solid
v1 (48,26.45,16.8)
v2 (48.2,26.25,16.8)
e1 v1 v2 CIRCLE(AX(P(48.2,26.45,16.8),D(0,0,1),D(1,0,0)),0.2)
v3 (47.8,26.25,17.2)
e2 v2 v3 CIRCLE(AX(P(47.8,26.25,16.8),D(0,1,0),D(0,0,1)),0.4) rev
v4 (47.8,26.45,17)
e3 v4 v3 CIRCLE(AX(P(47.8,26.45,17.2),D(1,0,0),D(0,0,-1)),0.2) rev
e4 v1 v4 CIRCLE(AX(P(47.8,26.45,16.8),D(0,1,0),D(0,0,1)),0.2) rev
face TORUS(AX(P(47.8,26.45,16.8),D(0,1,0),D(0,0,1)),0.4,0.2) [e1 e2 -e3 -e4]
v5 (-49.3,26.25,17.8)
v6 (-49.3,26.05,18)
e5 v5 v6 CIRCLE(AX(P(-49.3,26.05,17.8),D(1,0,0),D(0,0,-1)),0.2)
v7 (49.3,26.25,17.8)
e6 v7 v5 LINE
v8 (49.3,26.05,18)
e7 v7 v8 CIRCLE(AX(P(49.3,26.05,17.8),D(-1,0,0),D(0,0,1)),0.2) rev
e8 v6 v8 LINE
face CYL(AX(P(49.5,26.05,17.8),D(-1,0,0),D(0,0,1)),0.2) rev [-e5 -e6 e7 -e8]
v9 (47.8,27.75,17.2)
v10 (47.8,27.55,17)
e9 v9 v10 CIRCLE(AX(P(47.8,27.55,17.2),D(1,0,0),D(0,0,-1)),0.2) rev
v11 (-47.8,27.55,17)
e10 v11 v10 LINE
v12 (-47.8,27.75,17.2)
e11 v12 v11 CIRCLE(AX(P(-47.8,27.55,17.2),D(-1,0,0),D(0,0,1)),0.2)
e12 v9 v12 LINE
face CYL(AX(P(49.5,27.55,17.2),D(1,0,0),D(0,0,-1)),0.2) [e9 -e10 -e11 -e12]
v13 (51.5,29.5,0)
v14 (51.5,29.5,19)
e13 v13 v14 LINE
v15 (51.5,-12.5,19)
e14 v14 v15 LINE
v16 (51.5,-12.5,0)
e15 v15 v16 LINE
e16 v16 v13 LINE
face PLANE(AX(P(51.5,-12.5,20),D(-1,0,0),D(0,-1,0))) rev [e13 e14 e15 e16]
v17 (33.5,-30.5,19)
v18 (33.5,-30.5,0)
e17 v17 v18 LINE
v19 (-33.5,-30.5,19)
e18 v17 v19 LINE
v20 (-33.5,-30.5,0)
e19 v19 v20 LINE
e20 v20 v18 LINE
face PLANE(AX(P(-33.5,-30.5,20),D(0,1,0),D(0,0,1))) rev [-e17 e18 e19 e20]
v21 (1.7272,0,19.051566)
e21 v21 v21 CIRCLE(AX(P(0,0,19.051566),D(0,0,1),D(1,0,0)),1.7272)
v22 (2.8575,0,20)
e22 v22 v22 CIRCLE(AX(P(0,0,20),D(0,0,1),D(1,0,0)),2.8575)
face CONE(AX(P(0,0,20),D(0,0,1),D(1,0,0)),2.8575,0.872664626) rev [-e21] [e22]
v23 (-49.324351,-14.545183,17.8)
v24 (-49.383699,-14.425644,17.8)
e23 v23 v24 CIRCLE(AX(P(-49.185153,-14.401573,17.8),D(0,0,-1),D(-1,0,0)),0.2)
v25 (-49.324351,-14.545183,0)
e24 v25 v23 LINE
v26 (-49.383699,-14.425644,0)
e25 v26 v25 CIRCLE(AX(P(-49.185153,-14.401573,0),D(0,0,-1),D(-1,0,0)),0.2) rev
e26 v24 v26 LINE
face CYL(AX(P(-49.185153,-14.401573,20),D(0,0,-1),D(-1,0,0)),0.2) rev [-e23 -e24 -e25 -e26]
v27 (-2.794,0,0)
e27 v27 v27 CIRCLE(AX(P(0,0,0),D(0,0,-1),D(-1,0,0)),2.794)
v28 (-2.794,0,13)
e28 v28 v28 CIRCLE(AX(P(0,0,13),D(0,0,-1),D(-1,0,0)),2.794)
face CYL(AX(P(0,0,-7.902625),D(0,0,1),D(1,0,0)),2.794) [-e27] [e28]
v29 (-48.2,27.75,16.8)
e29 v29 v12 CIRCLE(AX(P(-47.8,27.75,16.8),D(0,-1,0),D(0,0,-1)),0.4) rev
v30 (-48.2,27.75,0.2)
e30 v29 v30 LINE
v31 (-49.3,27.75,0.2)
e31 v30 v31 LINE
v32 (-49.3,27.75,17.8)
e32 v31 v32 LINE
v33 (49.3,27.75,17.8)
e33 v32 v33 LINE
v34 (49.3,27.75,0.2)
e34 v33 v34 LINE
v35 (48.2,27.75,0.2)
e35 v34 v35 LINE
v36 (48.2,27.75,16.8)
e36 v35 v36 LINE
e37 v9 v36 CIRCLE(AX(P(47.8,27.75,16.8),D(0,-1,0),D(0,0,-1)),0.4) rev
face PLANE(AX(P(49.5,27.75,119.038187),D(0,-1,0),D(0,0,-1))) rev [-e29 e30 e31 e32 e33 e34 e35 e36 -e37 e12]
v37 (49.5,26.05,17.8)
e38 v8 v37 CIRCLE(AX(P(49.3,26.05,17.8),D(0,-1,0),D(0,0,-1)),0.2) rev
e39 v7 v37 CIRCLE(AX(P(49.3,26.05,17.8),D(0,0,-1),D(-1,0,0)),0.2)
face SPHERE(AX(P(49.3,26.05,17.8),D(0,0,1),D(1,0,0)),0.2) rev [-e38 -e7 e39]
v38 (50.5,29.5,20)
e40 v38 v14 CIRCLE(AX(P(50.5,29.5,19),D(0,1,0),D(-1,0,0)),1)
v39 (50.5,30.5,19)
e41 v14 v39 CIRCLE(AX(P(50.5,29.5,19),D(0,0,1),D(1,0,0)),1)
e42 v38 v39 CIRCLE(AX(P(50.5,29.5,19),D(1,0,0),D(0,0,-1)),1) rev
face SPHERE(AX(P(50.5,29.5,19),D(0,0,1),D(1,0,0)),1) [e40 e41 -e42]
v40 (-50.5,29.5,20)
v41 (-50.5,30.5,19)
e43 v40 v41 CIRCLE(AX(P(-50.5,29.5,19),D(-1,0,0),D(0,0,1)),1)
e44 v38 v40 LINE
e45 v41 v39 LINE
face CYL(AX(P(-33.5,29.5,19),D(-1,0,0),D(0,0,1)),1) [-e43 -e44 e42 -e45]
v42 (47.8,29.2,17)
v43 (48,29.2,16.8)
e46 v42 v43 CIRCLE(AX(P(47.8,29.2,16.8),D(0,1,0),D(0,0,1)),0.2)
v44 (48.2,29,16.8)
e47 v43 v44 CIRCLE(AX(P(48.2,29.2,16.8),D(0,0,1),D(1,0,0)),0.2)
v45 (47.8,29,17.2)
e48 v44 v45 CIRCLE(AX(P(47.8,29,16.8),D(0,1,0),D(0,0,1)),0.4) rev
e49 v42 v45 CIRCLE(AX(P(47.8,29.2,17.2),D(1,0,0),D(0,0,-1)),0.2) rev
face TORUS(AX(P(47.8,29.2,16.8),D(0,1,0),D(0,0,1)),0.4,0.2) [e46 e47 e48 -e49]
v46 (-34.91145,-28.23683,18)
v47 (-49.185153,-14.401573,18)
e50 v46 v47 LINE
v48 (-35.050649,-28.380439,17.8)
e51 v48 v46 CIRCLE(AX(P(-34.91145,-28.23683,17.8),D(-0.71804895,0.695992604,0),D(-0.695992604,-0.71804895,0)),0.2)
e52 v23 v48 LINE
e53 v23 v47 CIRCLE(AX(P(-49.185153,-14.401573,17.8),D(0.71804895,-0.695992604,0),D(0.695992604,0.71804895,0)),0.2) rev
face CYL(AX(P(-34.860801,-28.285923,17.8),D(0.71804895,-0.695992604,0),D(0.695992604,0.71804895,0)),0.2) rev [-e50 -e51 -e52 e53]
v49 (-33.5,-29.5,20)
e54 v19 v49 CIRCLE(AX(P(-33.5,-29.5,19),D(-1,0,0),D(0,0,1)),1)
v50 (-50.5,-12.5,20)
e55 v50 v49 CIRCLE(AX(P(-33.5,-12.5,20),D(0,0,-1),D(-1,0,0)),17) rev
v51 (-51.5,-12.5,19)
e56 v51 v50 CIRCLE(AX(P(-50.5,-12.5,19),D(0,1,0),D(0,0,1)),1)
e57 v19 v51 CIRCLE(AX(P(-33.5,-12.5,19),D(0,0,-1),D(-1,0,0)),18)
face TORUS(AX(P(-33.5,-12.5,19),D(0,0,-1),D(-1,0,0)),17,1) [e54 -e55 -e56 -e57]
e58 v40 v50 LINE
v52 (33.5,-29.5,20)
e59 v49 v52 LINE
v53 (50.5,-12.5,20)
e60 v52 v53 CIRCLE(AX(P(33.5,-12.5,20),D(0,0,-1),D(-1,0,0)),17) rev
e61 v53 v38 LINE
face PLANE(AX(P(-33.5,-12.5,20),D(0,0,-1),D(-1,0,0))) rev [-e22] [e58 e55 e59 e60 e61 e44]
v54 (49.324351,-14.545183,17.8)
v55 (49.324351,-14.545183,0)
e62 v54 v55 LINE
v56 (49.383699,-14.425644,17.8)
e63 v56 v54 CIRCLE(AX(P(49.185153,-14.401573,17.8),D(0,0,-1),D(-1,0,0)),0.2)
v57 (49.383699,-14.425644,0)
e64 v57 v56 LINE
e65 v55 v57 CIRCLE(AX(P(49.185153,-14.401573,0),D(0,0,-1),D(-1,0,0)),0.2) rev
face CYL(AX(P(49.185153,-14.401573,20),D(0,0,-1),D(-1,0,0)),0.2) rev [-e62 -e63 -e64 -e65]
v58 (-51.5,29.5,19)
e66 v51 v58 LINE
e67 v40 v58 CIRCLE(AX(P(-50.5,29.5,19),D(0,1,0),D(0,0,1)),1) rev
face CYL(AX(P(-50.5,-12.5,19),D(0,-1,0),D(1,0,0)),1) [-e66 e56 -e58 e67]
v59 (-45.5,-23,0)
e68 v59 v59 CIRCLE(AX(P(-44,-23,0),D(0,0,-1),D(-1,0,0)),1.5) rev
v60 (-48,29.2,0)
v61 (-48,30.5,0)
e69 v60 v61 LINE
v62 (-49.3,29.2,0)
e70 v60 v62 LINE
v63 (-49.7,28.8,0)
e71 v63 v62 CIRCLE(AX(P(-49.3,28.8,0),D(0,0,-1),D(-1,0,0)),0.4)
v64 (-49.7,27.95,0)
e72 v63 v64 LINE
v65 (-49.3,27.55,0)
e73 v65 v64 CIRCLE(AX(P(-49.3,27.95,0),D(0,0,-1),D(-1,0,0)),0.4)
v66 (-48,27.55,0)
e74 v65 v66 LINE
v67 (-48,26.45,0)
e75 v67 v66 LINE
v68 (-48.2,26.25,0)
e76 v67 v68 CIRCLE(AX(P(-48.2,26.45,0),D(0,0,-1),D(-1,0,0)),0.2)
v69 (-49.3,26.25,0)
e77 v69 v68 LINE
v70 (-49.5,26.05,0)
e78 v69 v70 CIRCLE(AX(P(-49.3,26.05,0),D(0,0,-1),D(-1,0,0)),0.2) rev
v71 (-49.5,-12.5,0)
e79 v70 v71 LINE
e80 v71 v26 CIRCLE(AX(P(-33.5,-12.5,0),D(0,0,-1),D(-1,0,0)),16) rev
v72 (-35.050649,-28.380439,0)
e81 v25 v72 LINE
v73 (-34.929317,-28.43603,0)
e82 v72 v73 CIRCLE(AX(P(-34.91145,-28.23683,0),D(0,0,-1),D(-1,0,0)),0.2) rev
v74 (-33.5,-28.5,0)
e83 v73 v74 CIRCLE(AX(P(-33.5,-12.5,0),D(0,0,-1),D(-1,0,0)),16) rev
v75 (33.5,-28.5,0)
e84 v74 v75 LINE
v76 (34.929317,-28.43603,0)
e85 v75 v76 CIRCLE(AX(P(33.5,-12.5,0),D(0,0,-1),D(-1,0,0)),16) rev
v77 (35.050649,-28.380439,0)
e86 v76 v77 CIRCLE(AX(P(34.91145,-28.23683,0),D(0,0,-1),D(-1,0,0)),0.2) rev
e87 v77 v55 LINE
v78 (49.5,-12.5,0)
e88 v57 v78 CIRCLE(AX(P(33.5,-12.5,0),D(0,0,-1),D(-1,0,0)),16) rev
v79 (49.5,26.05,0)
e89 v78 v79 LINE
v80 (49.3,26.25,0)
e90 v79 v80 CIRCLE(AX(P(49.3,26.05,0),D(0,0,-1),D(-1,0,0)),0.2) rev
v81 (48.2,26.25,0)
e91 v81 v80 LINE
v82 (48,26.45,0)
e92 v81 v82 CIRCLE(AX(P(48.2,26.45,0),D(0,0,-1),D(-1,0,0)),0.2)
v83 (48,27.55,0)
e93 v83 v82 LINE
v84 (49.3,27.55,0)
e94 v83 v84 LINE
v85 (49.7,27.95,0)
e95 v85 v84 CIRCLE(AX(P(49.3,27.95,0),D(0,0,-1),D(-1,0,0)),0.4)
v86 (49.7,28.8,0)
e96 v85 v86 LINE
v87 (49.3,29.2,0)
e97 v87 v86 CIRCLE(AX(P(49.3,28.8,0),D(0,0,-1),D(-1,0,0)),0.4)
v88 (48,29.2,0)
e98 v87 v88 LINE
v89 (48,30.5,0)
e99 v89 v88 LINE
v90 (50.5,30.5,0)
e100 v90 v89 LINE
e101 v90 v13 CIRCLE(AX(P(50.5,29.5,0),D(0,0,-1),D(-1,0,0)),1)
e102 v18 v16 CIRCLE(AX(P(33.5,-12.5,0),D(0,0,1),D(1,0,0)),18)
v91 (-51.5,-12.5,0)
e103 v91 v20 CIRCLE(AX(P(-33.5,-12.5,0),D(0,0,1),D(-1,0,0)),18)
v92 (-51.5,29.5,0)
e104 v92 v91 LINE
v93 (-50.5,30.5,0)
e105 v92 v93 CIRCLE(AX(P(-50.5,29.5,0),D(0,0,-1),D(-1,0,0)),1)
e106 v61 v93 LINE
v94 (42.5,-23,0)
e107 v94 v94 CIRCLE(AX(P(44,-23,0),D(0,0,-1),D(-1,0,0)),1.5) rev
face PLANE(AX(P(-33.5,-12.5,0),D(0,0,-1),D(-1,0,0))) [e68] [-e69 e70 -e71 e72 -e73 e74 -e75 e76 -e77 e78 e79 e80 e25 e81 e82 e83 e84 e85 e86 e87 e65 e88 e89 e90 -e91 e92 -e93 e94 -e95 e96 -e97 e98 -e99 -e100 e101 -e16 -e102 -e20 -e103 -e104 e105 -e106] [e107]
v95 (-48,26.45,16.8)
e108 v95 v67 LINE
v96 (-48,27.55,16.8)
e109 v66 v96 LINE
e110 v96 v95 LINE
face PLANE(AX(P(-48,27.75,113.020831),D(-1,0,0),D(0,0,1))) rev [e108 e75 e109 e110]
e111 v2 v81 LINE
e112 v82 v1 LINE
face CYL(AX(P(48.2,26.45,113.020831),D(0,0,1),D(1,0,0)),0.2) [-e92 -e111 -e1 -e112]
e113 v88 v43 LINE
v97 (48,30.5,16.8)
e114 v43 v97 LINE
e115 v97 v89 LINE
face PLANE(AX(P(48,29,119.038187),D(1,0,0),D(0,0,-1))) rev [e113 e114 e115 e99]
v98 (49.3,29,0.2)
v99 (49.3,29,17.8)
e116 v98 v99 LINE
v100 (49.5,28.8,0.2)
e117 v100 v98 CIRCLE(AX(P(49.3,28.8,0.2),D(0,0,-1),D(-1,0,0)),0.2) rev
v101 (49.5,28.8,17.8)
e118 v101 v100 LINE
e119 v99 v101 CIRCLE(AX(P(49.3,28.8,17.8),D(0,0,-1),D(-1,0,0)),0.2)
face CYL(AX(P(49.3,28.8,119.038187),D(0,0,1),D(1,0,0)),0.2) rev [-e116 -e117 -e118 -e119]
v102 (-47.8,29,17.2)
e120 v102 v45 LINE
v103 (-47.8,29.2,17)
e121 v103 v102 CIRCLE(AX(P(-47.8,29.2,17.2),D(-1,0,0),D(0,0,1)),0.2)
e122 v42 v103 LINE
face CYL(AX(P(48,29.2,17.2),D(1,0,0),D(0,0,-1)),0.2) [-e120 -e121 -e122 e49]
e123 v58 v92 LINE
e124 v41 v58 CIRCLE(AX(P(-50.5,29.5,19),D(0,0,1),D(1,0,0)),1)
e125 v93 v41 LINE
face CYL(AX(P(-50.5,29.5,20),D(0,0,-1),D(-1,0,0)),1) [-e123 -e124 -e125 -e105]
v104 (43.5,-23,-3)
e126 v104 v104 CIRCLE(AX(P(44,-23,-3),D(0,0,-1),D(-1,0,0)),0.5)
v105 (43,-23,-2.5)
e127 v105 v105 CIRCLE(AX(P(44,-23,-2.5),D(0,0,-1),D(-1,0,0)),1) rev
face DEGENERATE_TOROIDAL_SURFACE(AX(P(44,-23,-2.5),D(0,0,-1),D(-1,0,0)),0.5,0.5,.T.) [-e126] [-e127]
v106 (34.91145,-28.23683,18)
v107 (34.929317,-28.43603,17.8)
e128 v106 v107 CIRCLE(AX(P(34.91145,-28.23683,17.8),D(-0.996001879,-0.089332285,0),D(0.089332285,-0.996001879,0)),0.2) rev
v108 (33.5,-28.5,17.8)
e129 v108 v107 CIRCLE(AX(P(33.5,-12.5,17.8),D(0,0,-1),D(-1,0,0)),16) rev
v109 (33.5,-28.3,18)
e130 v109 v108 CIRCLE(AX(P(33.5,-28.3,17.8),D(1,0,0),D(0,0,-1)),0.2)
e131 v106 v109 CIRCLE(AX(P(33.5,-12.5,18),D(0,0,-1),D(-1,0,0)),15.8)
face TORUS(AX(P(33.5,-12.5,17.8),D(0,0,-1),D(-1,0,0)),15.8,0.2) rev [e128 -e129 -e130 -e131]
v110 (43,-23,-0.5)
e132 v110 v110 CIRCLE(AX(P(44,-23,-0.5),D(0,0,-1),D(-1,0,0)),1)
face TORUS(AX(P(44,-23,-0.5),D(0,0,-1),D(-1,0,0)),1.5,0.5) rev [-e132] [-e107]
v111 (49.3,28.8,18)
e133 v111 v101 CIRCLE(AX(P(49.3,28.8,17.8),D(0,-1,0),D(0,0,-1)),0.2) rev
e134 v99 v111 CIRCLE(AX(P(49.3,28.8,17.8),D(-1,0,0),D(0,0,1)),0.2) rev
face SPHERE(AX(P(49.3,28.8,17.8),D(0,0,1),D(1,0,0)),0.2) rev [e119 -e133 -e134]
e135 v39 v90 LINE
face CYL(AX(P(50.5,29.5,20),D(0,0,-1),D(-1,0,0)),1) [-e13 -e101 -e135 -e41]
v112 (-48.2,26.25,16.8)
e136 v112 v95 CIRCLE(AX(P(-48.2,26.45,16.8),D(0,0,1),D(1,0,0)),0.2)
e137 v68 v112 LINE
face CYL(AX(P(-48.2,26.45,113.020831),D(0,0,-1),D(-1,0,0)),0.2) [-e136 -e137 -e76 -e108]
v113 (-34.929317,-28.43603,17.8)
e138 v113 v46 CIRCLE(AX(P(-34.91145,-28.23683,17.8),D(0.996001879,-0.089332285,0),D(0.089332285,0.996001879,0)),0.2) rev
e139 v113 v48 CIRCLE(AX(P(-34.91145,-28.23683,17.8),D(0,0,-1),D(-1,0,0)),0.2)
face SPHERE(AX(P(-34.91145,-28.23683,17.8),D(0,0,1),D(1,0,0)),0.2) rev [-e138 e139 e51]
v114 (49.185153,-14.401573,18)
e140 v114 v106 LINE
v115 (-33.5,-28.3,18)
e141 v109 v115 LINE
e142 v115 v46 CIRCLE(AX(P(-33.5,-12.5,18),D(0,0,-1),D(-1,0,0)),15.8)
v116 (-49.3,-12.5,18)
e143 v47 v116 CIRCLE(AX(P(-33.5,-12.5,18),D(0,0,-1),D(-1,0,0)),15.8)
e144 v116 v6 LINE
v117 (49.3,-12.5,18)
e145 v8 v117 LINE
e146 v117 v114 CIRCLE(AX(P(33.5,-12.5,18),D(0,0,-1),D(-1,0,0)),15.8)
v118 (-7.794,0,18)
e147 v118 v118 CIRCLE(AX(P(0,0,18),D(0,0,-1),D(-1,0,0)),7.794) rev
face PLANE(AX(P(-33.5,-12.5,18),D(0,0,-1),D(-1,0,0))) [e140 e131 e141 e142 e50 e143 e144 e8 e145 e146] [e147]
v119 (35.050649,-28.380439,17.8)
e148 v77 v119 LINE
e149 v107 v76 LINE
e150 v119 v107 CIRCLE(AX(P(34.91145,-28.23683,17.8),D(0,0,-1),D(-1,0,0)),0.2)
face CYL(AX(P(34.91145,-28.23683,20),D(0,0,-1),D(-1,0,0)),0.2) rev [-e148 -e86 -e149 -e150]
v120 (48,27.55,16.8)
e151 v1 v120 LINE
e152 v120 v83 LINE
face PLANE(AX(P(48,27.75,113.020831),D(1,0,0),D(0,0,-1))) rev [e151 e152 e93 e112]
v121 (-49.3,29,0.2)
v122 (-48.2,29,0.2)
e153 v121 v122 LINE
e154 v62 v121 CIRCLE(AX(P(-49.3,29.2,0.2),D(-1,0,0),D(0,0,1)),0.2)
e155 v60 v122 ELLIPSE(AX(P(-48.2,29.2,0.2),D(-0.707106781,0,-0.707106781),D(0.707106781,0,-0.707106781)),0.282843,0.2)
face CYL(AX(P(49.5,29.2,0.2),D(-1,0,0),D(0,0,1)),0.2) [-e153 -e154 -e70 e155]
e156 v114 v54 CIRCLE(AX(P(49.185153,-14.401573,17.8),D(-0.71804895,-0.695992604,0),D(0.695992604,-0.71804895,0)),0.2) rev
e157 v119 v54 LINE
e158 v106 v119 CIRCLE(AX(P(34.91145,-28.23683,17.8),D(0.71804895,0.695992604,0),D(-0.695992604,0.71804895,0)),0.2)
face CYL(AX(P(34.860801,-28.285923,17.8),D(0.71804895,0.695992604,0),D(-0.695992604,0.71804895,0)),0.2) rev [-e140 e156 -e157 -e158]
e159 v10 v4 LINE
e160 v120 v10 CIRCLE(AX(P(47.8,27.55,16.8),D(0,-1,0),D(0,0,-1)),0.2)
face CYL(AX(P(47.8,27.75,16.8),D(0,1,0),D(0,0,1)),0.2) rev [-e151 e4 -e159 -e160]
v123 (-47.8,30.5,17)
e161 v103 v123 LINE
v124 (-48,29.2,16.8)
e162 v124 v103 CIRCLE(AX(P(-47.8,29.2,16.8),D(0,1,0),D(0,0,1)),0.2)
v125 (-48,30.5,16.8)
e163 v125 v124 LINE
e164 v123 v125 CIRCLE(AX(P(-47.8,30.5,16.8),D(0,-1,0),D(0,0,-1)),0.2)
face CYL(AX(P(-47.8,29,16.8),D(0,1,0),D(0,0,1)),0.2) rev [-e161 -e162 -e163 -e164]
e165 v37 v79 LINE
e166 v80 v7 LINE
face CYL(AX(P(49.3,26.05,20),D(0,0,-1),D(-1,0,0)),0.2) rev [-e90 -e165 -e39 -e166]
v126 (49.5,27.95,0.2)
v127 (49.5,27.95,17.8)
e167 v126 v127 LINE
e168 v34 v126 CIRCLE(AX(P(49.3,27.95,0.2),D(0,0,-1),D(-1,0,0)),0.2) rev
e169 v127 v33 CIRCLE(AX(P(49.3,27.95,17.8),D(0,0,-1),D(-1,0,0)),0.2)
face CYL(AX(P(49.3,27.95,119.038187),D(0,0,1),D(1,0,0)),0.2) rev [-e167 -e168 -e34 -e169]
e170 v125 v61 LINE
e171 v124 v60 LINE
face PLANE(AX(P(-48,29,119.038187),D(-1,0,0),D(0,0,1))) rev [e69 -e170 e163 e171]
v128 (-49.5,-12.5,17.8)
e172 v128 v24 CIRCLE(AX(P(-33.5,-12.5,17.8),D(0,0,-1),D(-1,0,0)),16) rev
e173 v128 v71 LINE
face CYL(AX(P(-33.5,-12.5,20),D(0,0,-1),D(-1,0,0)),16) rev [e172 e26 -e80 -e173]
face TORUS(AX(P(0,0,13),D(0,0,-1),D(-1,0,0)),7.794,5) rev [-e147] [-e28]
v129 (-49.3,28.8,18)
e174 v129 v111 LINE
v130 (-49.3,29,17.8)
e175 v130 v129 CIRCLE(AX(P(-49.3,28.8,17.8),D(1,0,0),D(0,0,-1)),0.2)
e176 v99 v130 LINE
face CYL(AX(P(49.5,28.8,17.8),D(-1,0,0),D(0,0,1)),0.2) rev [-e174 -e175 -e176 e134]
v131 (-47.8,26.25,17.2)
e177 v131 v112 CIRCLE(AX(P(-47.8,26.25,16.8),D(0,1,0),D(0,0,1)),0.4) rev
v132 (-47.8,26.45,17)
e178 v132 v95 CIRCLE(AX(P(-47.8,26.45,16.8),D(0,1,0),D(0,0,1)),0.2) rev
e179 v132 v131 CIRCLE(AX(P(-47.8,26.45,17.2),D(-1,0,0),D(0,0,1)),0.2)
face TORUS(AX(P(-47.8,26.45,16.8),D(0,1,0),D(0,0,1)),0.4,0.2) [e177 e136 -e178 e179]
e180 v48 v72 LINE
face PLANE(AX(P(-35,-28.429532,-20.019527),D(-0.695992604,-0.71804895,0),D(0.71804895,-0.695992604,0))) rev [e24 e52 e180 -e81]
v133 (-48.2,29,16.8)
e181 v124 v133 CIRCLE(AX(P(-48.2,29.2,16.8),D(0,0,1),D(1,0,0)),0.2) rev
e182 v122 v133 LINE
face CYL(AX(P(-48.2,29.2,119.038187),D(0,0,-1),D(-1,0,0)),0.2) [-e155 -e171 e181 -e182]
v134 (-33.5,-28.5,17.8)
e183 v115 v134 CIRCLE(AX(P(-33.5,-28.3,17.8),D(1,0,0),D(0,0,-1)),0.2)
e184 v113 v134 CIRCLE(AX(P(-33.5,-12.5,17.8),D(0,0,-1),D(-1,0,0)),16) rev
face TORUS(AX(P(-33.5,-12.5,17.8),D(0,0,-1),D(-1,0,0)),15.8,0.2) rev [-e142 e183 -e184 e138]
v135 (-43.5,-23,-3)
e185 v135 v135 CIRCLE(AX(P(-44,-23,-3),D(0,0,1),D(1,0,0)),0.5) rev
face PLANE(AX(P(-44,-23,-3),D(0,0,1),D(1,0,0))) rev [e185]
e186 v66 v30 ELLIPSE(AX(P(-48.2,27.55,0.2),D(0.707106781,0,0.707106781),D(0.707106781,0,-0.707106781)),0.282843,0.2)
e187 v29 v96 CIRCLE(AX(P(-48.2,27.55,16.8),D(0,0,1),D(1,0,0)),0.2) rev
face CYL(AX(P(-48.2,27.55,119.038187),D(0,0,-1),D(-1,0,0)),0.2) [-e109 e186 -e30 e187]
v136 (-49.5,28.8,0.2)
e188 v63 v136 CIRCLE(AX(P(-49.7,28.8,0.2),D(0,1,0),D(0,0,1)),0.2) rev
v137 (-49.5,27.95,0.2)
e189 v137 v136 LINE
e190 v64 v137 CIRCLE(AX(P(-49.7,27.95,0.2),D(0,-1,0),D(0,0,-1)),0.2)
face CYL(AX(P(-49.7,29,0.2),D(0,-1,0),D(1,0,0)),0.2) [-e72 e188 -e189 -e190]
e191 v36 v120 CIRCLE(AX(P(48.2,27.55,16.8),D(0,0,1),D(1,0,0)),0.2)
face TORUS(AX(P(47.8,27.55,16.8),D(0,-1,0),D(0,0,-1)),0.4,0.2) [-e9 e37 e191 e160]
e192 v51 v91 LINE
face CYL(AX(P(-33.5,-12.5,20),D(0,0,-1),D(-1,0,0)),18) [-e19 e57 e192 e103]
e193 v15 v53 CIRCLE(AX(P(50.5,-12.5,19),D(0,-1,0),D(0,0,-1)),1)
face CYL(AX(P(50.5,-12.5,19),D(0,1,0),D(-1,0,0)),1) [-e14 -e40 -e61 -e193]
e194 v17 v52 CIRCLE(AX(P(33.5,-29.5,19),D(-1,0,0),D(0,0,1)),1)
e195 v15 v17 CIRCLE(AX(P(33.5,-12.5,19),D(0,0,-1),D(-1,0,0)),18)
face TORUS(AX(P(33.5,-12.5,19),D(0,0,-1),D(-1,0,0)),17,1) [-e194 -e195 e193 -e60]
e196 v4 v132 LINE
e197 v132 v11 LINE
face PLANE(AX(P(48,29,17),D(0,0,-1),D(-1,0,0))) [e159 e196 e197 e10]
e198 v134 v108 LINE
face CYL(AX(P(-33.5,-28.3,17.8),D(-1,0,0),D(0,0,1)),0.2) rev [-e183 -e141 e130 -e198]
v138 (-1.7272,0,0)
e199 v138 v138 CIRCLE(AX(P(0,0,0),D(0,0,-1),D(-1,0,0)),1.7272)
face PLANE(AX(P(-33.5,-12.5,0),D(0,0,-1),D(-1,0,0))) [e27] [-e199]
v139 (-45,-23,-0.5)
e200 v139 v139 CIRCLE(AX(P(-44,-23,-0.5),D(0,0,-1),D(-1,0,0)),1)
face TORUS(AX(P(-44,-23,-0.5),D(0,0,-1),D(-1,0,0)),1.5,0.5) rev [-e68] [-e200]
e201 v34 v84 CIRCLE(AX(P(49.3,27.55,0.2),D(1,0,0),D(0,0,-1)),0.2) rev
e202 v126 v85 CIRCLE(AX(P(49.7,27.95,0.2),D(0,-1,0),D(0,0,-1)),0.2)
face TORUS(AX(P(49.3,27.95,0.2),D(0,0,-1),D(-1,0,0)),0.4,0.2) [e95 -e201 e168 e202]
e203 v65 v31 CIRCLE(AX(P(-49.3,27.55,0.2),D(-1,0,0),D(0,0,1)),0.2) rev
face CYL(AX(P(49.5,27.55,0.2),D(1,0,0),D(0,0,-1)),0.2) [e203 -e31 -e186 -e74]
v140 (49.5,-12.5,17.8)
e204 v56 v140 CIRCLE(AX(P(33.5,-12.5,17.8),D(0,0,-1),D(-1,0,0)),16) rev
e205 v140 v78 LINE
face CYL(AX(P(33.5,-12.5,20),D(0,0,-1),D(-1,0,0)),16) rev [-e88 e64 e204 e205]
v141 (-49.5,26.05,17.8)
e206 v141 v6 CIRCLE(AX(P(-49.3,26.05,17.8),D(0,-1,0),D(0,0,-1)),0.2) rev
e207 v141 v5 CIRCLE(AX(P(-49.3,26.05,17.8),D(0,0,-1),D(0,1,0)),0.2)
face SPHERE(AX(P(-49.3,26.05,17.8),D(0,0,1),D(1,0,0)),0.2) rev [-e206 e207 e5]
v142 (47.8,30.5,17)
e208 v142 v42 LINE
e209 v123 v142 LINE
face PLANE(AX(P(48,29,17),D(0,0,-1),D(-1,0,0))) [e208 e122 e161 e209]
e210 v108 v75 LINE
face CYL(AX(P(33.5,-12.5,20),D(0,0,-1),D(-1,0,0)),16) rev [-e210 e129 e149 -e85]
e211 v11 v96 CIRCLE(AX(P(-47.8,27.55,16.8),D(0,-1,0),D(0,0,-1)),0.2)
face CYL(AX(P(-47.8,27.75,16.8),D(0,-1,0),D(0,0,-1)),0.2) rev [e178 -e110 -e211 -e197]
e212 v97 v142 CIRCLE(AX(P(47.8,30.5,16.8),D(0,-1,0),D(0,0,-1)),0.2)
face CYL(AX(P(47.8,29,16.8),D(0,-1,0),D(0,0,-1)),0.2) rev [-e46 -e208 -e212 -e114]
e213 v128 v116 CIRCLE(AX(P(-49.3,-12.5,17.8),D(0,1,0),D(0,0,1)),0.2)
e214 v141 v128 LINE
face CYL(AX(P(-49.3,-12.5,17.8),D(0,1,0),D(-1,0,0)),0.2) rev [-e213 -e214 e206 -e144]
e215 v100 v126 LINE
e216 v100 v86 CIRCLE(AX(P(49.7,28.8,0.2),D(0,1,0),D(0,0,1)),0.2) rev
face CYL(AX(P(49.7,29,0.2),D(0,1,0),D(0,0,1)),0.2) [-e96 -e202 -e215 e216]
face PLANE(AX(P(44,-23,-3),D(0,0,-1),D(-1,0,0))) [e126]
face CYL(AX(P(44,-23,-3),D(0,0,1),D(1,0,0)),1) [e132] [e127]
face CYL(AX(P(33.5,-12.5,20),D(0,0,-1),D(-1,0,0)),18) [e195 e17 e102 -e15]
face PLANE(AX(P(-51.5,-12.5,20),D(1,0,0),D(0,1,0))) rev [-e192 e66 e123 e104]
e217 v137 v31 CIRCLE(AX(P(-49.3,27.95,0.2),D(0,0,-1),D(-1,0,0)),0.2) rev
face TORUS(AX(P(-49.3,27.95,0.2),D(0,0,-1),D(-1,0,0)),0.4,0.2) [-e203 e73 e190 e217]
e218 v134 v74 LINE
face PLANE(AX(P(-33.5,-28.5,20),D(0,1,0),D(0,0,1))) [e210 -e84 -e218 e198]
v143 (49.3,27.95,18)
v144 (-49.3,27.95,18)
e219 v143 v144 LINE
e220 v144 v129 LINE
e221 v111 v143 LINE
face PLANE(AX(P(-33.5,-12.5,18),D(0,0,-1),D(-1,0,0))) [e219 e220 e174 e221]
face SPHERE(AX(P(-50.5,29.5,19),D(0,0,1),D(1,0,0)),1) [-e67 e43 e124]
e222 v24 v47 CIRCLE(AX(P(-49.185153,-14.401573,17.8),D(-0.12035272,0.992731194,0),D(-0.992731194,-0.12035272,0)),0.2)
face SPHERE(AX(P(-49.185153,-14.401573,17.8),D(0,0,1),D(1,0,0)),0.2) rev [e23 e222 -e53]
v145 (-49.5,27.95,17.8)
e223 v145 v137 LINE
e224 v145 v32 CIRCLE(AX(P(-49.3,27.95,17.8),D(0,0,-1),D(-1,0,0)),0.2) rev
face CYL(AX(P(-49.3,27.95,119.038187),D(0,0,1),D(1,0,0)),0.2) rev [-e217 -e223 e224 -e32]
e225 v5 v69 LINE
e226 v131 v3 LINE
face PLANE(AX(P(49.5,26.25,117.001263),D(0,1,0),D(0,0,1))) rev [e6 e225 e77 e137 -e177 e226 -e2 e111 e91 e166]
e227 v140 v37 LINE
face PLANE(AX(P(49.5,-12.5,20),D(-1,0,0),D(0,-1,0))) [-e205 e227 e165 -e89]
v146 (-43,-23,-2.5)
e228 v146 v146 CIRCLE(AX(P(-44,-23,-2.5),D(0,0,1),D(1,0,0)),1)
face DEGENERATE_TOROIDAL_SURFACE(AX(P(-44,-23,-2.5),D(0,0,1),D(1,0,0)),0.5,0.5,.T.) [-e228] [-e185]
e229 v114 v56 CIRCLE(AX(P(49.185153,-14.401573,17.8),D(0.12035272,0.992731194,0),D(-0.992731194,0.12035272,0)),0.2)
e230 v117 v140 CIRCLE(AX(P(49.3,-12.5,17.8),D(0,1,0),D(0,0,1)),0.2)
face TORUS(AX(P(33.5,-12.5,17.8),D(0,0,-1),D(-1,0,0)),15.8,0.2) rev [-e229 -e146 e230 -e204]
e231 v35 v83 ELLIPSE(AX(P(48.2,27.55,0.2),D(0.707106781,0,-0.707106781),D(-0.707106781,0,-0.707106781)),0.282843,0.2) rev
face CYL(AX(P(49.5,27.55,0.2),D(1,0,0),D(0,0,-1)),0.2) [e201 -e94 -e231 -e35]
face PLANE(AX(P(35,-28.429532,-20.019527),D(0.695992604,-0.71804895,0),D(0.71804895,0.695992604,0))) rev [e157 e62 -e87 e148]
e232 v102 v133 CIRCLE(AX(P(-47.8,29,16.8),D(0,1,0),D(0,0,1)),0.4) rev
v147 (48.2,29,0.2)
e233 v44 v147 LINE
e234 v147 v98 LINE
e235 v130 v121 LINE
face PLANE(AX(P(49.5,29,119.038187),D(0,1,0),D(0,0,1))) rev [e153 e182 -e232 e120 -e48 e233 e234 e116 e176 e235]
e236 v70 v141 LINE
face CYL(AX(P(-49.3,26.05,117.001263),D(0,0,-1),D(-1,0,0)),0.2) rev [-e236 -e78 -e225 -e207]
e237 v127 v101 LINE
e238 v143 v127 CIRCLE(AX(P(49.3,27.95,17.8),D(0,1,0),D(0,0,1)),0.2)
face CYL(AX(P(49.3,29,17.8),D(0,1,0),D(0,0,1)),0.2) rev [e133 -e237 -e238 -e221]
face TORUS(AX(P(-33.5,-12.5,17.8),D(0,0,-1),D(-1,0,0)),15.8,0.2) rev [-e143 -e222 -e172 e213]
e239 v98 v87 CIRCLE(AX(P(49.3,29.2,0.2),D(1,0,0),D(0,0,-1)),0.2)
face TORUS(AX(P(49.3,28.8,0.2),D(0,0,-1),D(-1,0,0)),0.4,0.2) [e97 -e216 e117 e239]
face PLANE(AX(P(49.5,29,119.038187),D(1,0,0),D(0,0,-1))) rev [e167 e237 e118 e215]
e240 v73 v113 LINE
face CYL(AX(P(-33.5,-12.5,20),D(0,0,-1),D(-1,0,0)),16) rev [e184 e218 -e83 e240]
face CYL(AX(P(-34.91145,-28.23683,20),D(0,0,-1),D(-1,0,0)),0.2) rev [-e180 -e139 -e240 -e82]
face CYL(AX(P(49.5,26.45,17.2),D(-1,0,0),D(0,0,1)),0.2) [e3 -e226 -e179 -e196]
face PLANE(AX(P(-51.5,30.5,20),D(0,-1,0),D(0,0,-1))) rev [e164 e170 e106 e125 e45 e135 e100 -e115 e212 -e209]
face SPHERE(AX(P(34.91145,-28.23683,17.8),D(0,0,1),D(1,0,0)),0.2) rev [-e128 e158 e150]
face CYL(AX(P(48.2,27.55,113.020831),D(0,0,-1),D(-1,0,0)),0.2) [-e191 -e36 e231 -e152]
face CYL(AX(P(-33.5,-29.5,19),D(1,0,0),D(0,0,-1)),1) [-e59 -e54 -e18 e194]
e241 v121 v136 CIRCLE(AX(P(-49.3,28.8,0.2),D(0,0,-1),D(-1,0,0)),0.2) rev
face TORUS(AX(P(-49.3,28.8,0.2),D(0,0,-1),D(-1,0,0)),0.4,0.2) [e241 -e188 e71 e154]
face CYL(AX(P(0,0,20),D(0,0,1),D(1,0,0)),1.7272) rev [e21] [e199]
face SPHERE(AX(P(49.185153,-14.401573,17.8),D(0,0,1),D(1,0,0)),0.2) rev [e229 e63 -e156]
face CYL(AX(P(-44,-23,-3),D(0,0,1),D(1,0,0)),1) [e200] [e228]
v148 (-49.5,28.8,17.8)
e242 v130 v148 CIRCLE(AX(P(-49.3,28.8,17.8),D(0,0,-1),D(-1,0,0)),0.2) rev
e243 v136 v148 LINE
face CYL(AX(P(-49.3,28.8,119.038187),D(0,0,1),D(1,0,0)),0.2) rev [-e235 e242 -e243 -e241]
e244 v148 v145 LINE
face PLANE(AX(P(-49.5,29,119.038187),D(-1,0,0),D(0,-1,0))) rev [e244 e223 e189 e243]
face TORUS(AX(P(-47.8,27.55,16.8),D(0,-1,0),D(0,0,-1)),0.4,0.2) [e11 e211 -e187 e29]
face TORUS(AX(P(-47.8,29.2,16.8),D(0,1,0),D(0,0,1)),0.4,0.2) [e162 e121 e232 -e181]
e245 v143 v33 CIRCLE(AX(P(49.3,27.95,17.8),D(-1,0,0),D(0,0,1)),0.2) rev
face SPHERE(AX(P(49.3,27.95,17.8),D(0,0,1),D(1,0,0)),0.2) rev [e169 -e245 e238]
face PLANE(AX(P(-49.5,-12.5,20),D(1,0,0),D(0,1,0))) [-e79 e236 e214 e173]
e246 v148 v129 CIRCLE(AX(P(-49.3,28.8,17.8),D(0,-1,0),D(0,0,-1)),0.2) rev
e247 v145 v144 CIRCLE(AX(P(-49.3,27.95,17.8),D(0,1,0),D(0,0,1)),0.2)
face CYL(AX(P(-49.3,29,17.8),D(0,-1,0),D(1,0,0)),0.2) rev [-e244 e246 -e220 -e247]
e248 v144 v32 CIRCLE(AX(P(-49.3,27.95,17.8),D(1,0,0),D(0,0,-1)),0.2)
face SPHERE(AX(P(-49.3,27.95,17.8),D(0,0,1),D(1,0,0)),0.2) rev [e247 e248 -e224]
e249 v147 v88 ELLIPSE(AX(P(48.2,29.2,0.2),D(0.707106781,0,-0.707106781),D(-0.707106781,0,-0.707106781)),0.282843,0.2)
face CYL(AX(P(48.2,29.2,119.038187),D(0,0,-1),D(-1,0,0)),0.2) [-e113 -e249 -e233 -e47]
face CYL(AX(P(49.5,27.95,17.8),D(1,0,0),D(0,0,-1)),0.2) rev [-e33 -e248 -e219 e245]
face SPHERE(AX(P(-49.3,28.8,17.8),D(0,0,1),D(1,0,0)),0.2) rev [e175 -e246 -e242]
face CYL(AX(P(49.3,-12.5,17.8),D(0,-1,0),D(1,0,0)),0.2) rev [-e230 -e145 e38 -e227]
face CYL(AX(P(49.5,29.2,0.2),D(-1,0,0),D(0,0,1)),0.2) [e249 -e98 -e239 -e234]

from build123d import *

# Parameters (mm, degrees)
BOSS_EXTRU_1_DEPTH                                = 20
ENL_V_MAT_EXTRU_1_DEPTH                           = 18
COQUE2_DEPTH                                      = 18
ESQUISSE14_W                                      = 96
ESQUISSE14_H                                      = 1.5
BOSS_EXTRU_8_DEPTH                                = 1
ESQUISSE3_W                                       = 96
ESQUISSE3_H                                       = 2
ENL_V_MAT_EXTRU_2_DEPTH                           = 17
ESQUISSE4_R                                       = 2.794
BOSS_EXTRU_2_DEPTH                                = 18
ESQUISSE5_R                                       = 1
ENL_V_MAT_EXTRU_3_DEPTH                           = 5
BOSS_EXTRU_4_START                                = 18
BOSS_EXTRU_4_DEPTH                                = 18
ESQUISSE8_R                                       = 1
BOSS_EXTRU_5_DEPTH                                = 3
CONG_5_R                                          = 0.5
CONG_6_R                                          = 1
ENL_V_MAT_EXTRU_4_REACH                           = 65.107
ESQUISSE9_W                                       = 99
ESQUISSE9_H                                       = 0.5
CONG_8_R                                          = 0.2
CSK_FOR_4_FLAT_HEAD_MACHINE_SCREW_100_D           = 3.4544
CSK_FOR_4_FLAT_HEAD_MACHINE_SCREW_100_CSINK_D     = 5.715
CSK_FOR_4_FLAT_HEAD_MACHINE_SCREW_100_CSINK_ANGLE = 100
CONG_9_R                                          = 5


# Read off the part's stored shape, not the designer's step: Coque2
with BuildPart() as part:
    # Esquisse1 → Boss.-Extru.1 (new body)
    with BuildSketch(Plane.XY):
        with BuildLine():
            Line((-33.5, -30.5), (33.5, -30.5))
            ThreePointArc((33.5, -30.5), (46.227922061, -25.227922061), (51.5, -12.5))
            Line((51.5, -12.5), (51.5, 30.5))
            Line((51.5, 30.5), (-51.5, 30.5))
            Line((-51.5, 30.5), (-51.5, -12.5))
            ThreePointArc((-51.5, -12.5), (-46.227922061, -25.227922061), (-33.5, -30.5))
        make_face()
    extrude(amount=BOSS_EXTRU_1_DEPTH)

    # Esquisse2 → Enlèv. mat.-Extru.1 (cut)
    with BuildSketch(Plane(origin=(0, 0, 0), x_dir=(-1, 0, 0), z_dir=(0, 0, -1))):
        Polygon((-49.5, 29), (-48, 29), (-48, 30.5), (48, 30.5), (48, 29), (49.5, 29), (49.5, 27.75), (-49.5, 27.75), align=None)
    extrude(amount=-ENL_V_MAT_EXTRU_1_DEPTH, mode=Mode.SUBTRACT)

    # Coque2 outline → Coque2 (cut)
    with BuildSketch(Plane.XY):
        with BuildLine():
            Line((49.5, -12.5), (49.5, 25.75))
            Line((49.5, 25.75), (-49.5, 25.75))
            Line((-49.5, 25.75), (-49.5, -12.5))
            ThreePointArc((-49.5, -12.5), (-44.813708499, -23.813708499), (-33.5, -28.5))
            Line((-33.5, -28.5), (33.5, -28.5))
            ThreePointArc((33.5, -28.5), (44.813708499, -23.813708499), (49.5, -12.5))
        make_face()
    extrude(amount=COQUE2_DEPTH, mode=Mode.SUBTRACT)

    # Esquisse14 → Boss.-Extru.8 (add)
    with BuildSketch(Plane(origin=(0, 0, 18), x_dir=(-1, 0, 0), z_dir=(0, 0, -1))):
        with Locations((0, 29.75)):
            Rectangle(ESQUISSE14_W, ESQUISSE14_H)
    extrude(amount=BOSS_EXTRU_8_DEPTH)

    # Esquisse3 → Enlèv. mat.-Extru.2 (cut)
    with BuildSketch(Plane(origin=(0, 0, 0), x_dir=(-1, 0, 0), z_dir=(0, 0, -1))):
        with Locations((0, 26.75)):
            Rectangle(ESQUISSE3_W, ESQUISSE3_H)
    extrude(amount=-ENL_V_MAT_EXTRU_2_DEPTH, mode=Mode.SUBTRACT)

    # Esquisse4 → Boss.-Extru.2 (add)
    with BuildSketch(Plane(origin=(0, 0, 18), x_dir=(-1, 0, 0), z_dir=(0, 0, -1))):
        Circle(ESQUISSE4_R)
    extrude(amount=BOSS_EXTRU_2_DEPTH)

    # Esquisse5 → Enlèv. mat.-Extru.3 (cut)
    with BuildSketch(Plane(origin=(0, 0, 0), x_dir=(-1, 0, 0), z_dir=(0, 0, -1))):
        Circle(ESQUISSE5_R)
    extrude(amount=-ENL_V_MAT_EXTRU_3_DEPTH, mode=Mode.SUBTRACT)

    # Esquisse7 → Boss.-Extru.4 (add)
    with BuildSketch(Plane(origin=(0, 0, 18), x_dir=(-1, 0, 0), z_dir=(0, 0, -1)).offset(BOSS_EXTRU_4_START)):
        with BuildLine():
            Line((35, -28.429532322), (49.375, -14.496089928))
            ThreePointArc((49.375, -14.496089928), (44.635881666, -23.988783204), (35, -28.429532322))
        make_face()
        with BuildLine():
            Line((-35, -28.429532322), (-49.375, -14.496089928))
            ThreePointArc((-49.375, -14.496089928), (-44.635881666, -23.988783204), (-35, -28.429532322))
        make_face()
    extrude(amount=-BOSS_EXTRU_4_DEPTH)

    # Esquisse8 → Boss.-Extru.5 (add)
    with BuildSketch(Plane(origin=(0, 0, 0), x_dir=(-1, 0, 0), z_dir=(0, 0, -1))):
        with Locations((-44, -23)):
            Circle(ESQUISSE8_R)
        with Locations(Location((44, -23, 0), (0, 0, 180))):
            Circle(ESQUISSE8_R)
    extrude(amount=BOSS_EXTRU_5_DEPTH)

    # Congé5
    cong_5_edges = [part.edges().sort_by_distance(p)[0] for p in [
        (45, -23, 0),
        (45, -23, -3),
        (-45, -23, 0),
        (-45, -23, -3),
    ]]
    fillet(cong_5_edges, radius=CONG_5_R)

    # Congé6
    cong_6_edges = [part.edges().sort_by_distance(p)[0] for p in [
        (-51.5, 9, 20),
        (-51.5, 30.5, 10),
        (51.5, 30.5, 10),
        (-46.227922061, -25.227922061, 20),
        (0, -30.5, 20),
        (46.227922061, -25.227922061, 20),
        (51.5, 9, 20),
        (0, 30.5, 20),
    ]]
    fillet(cong_6_edges, radius=CONG_6_R)

    # Enlèv. mat.-Extru.4: up to this face of the body (flat: up to its plane)
    enl_v_mat_extru_4_end = Plane(part.part.faces().sort_by_distance((0, 28.375, 18))[0])
    # Esquisse9 → Enlèv. mat.-Extru.4 (cut, up to the picked face)
    with BuildSketch(Plane(origin=(0, 0, 0), x_dir=(-1, 0, 0), z_dir=(0, 0, -1)), mode=Mode.PRIVATE) as enl_v_mat_extru_4_sk1:
        with Locations((0, 26)):
            Rectangle(ESQUISSE9_W, ESQUISSE9_H)
    enl_v_mat_extru_4_tool1 = split(extrude(enl_v_mat_extru_4_sk1.sketch, amount=-ENL_V_MAT_EXTRU_4_REACH, mode=Mode.PRIVATE), bisect_by=enl_v_mat_extru_4_end, keep=Keep.BOTH, mode=Mode.PRIVATE)
    add(enl_v_mat_extru_4_tool1.solids().sort_by(Axis((0, 26, 0), (0, 0, 1)))[0], mode=Mode.SUBTRACT)

    # Congé8
    cong_8_edges = [part.edges().sort_by_distance(p)[0] for p in [
        (-48, 27.75, 8.5),
        (-48.75, 29, 0),
        (-48.75, 27.75, 0),
        (48.75, 27.75, 0),
        (48.75, 29, 0),
        (-48, 29, 8.5),
        (0, 27.75, 17),
        (-49.5, 29, 9),
        (-49.5, 28.375, 0),
        (-49.5, 27.75, 9),
        (49.5, 27.75, 9),
        (49.5, 28.375, 0),
        (49.5, 29, 9),
        (0, 27.75, 18),
        (49.5, 28.375, 18),
        (0, 29, 18),
        (-49.5, 28.375, 18),
        (49.5, 6.875, 18),
        (0, 26.25, 18),
        (-49.5, 6.875, 18),
        (-49.468719423, -13.5, 18),
        (-42.1875, -21.462811125, 18),
        (-34.250827159, -28.482373371, 18),
        (0, -28.5, 18),
        (34.250827159, -28.482373371, 18),
        (42.1875, -21.462811125, 18),
        (49.468719423, -13.5, 18),
        (-49.375, -14.496089928, 9),
        (-35, -28.429532322, 9),
        (35, -28.429532322, 9),
        (49.375, -14.496089928, 9),
        (-48, 29.75, 17),
        (-48, 27, 17),
        (-48, 26.25, 8.5),
        (-49.5, 26.25, 9),
        (48, 27, 17),
        (0, 26.25, 17),
        (48, 29.75, 17),
        (0, 29, 17),
        (48, 29, 8.5),
        (48, 27.75, 8.5),
        (48, 26.25, 8.5),
        (49.5, 26.25, 9),
    ]]
    fillet(cong_8_edges, radius=CONG_8_R)

    # CSK for #4 Flat Head Machine Screw (100)1 (through all)
    with Locations(Plane.XY.offset(20)):
        with Locations((0, 0)):
            CounterSinkHole(CSK_FOR_4_FLAT_HEAD_MACHINE_SCREW_100_D / 2, CSK_FOR_4_FLAT_HEAD_MACHINE_SCREW_100_CSINK_D / 2, counter_sink_angle=CSK_FOR_4_FLAT_HEAD_MACHINE_SCREW_100_CSINK_ANGLE)

    # Congé9
    cong_9_edges = [part.edges().sort_by_distance(p)[0] for p in [
        (2.794, 0, 18),
    ]]
    fillet(cong_9_edges, radius=CONG_9_R)


solid = part.part
